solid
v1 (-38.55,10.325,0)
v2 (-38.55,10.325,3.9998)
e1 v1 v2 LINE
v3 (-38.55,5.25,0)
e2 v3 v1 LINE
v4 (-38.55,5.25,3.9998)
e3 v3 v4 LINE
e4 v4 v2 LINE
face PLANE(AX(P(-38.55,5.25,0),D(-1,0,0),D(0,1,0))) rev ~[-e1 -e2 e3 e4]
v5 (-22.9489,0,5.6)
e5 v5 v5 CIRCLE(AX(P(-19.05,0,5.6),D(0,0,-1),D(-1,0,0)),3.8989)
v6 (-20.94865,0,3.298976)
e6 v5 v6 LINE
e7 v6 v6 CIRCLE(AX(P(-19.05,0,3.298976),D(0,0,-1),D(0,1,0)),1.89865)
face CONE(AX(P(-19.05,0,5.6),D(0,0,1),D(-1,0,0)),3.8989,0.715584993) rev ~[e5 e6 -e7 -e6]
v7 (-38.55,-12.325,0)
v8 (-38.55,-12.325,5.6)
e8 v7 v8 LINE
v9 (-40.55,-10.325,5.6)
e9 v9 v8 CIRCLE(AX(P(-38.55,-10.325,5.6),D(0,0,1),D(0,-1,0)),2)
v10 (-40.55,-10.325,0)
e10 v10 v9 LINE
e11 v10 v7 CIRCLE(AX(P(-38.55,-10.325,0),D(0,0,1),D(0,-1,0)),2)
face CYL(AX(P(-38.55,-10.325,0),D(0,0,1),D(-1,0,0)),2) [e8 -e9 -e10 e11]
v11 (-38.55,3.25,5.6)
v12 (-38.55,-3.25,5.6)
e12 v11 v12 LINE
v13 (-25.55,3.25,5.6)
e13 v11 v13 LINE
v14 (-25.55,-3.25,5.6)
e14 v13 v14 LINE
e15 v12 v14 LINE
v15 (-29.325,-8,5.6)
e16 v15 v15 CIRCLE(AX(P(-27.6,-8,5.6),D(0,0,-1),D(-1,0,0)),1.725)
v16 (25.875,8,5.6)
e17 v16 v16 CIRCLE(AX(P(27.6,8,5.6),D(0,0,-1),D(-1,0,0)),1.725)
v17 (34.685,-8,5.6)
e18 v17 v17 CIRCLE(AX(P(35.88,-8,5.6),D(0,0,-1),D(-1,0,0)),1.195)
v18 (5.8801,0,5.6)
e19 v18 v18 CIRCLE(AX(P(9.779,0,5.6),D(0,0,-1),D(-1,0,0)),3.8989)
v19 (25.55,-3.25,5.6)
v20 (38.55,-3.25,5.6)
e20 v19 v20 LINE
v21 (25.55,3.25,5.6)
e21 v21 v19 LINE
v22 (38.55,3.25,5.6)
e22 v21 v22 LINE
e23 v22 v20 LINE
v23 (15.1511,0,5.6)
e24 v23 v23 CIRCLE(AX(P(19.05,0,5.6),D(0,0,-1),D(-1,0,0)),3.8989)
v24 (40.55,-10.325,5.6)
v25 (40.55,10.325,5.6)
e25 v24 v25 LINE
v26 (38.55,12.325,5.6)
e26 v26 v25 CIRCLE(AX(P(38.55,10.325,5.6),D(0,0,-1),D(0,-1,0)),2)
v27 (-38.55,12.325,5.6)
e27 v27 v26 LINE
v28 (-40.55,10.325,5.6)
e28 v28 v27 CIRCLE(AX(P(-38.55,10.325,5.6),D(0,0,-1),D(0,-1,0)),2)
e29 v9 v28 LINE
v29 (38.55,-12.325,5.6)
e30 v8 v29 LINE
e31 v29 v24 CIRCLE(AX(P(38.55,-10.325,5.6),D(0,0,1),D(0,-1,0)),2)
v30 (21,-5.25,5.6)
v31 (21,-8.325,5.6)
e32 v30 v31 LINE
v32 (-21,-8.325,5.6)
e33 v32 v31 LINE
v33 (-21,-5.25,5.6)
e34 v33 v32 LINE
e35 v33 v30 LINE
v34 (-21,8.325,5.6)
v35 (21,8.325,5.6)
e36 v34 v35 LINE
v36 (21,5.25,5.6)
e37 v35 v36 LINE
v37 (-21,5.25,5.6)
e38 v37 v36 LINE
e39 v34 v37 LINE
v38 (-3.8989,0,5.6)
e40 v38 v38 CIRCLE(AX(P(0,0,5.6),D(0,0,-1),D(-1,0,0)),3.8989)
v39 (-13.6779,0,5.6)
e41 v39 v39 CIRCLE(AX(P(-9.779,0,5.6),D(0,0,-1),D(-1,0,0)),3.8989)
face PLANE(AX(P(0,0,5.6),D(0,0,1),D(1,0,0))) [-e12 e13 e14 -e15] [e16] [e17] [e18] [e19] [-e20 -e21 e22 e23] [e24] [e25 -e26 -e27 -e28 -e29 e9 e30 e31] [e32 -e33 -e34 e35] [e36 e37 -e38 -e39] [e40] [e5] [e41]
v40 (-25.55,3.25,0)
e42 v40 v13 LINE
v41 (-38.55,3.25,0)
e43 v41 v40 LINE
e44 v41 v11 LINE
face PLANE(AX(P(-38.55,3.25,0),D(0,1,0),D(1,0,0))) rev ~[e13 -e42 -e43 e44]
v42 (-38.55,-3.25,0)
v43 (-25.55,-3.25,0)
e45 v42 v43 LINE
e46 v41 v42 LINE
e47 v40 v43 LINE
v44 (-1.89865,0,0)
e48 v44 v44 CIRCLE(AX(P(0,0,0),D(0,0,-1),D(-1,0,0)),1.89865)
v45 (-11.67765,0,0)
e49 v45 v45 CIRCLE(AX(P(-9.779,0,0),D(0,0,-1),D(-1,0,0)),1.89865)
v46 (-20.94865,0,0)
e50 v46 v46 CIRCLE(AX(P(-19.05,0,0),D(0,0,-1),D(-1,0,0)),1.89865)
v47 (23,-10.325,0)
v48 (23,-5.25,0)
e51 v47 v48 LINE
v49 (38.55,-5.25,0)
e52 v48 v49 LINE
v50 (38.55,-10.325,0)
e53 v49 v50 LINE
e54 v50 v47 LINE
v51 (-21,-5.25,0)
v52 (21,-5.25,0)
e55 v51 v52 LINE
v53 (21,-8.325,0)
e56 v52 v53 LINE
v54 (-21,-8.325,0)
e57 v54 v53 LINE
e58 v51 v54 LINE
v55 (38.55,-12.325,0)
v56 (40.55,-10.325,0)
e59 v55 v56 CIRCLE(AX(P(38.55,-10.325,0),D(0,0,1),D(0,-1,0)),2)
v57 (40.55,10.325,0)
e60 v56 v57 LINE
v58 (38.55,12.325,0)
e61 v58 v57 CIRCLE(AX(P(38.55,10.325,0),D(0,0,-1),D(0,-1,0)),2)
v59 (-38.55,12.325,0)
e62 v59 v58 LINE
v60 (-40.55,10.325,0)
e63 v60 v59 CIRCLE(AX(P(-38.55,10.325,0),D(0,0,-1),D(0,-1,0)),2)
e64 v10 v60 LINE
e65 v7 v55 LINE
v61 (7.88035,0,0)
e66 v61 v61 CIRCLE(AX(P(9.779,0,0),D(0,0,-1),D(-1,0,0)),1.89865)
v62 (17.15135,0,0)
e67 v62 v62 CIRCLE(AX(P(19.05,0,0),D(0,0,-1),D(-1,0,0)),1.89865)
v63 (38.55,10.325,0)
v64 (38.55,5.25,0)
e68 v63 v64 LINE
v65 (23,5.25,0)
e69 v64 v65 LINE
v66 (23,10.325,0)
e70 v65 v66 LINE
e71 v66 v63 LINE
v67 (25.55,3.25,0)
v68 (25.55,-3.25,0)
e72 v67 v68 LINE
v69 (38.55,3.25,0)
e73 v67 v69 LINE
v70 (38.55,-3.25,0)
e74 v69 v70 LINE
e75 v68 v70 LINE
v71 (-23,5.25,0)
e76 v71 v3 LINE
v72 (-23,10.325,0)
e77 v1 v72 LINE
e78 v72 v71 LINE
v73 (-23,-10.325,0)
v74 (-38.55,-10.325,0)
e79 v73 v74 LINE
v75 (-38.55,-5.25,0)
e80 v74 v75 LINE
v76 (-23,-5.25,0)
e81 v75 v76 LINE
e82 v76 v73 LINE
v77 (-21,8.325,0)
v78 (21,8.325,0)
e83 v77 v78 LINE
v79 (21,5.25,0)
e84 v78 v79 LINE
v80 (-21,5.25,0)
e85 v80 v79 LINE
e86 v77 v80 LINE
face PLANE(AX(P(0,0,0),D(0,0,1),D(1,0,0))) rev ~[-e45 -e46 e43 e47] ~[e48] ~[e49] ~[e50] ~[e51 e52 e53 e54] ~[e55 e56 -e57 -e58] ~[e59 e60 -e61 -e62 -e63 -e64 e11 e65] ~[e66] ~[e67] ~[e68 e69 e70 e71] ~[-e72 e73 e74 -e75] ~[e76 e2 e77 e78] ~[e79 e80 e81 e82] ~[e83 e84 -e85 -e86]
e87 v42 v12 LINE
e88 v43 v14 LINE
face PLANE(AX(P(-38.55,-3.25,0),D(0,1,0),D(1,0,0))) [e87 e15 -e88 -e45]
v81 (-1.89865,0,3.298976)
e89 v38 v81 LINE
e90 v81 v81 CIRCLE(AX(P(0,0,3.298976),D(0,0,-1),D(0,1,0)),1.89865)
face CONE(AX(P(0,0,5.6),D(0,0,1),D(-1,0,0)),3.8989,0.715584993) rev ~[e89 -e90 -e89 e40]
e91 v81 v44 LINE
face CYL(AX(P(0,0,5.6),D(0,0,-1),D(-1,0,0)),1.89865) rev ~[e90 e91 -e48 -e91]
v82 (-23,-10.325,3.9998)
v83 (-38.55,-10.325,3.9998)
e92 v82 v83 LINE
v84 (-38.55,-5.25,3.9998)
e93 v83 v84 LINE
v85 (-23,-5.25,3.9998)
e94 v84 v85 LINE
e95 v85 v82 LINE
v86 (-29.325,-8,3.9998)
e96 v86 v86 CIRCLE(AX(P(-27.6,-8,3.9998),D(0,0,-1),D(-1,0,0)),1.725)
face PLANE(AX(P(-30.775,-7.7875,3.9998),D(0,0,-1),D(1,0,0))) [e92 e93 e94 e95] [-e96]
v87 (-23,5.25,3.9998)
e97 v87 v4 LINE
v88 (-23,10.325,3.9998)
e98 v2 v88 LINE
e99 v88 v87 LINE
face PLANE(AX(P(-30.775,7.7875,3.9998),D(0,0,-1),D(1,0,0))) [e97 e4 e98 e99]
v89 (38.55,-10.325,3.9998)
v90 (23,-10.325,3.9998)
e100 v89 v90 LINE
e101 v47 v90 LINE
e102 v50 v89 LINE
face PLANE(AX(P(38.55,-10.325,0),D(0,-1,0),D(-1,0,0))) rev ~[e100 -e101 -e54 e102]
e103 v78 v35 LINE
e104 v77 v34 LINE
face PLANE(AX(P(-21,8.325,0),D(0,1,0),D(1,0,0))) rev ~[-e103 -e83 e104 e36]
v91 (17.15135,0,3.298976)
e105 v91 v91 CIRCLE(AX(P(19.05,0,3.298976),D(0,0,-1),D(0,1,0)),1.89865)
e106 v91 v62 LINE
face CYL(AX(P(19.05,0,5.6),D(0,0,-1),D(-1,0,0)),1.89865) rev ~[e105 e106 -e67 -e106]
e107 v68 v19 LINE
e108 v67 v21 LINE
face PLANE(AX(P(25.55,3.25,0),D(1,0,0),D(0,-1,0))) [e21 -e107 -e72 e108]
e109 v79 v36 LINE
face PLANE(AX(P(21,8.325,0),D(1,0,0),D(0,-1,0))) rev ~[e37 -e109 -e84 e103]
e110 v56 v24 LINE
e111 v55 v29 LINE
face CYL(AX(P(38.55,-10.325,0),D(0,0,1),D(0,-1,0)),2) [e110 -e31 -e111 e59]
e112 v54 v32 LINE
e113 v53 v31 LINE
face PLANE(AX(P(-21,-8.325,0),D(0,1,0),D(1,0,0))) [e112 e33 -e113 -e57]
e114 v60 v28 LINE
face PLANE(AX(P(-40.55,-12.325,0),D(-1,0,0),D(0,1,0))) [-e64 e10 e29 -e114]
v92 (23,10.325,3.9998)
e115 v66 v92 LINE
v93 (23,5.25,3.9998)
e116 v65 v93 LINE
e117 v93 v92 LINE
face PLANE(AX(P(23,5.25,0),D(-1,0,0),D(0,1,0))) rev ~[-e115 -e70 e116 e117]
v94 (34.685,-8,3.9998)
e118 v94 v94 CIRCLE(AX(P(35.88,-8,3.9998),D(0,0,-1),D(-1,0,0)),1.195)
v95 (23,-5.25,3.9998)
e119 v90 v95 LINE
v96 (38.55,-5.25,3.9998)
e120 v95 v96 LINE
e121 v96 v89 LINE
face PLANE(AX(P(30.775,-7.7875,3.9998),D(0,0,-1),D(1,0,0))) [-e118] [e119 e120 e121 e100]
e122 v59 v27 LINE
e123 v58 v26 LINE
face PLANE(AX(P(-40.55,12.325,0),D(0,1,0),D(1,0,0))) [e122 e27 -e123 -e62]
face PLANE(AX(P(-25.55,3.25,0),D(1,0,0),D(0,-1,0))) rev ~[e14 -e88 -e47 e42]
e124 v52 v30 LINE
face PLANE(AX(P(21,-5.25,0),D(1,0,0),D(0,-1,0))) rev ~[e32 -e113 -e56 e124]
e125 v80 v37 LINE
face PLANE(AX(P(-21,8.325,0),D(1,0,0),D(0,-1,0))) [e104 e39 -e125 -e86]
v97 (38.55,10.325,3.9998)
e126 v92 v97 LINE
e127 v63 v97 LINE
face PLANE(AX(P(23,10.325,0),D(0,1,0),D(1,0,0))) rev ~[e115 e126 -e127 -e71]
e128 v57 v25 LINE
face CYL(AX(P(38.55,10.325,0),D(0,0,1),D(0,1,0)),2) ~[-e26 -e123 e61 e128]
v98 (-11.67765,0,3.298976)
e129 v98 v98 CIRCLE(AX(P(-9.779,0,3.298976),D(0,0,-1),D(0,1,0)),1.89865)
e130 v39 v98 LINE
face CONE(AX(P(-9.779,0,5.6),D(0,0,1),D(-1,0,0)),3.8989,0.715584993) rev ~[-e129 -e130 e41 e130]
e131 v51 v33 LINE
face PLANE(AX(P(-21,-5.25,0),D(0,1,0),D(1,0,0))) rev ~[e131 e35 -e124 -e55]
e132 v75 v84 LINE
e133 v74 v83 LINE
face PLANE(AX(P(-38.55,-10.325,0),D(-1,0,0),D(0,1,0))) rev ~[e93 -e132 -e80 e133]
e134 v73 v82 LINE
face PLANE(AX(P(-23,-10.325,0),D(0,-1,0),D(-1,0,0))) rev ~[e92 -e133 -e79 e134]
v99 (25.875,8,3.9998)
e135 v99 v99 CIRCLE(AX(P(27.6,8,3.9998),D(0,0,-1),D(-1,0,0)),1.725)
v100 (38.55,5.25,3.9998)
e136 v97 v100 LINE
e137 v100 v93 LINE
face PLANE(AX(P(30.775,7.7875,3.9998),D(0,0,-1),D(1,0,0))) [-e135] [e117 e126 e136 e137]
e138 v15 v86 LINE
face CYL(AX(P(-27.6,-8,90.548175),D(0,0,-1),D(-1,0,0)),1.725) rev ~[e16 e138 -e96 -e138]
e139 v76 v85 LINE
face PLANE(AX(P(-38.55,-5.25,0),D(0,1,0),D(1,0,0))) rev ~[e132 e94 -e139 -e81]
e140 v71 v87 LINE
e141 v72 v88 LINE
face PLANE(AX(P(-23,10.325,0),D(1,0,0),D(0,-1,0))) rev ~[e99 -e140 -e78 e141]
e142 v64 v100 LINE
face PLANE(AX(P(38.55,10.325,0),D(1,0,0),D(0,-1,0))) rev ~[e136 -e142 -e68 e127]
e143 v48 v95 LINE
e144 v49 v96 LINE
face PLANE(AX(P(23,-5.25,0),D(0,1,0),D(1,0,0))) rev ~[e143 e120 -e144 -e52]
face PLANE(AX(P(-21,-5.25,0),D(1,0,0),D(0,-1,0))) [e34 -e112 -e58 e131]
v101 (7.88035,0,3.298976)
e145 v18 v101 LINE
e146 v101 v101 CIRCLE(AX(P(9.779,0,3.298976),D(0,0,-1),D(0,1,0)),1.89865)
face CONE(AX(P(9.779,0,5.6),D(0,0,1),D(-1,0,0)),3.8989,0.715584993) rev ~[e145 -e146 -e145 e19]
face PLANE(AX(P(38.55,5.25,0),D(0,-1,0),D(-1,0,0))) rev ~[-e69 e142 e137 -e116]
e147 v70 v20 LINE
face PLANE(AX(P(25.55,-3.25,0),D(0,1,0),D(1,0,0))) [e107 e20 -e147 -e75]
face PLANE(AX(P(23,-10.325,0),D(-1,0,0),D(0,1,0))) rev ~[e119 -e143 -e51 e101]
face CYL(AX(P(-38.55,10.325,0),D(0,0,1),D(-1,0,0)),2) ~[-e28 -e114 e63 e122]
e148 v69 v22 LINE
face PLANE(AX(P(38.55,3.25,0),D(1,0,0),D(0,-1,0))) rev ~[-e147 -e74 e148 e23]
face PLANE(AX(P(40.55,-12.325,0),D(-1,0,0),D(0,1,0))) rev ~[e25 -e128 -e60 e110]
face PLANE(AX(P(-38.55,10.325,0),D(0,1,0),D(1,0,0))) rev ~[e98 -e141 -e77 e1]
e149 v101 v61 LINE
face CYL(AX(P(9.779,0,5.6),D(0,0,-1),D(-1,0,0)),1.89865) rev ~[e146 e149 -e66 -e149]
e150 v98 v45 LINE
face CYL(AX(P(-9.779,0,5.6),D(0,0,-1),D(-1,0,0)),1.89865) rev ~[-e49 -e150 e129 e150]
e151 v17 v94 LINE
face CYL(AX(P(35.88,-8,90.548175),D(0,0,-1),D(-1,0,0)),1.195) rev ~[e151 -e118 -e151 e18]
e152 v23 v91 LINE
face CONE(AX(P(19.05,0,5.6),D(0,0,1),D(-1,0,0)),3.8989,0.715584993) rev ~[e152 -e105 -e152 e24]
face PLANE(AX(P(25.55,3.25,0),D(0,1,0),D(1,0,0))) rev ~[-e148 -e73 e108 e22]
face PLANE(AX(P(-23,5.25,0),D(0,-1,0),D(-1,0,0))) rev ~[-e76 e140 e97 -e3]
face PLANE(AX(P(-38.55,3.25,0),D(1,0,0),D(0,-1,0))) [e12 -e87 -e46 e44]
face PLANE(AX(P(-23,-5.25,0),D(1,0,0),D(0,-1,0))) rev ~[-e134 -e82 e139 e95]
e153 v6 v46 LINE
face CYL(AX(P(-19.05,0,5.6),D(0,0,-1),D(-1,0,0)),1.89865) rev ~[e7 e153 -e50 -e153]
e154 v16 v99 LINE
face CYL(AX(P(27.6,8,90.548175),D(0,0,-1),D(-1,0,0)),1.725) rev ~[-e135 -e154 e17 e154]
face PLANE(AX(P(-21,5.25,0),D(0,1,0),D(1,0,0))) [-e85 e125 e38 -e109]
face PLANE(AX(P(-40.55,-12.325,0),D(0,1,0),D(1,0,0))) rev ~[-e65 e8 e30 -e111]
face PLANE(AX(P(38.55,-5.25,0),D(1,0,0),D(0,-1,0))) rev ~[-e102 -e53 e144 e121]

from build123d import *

# Parameters (mm, degrees)
F0_W           = 81.1
F0_H           = 24.65
F1_DEPTH       = 5.6
F3_D           = 3.45
F4_D           = 2.39
F6_D           = 3.7973
F6_CSINK_D     = 7.7978
F6_CSINK_ANGLE = 82
F7_R           = 1.725
F7_R_2         = 1.195
F8_DEPTH       = 3.9998
F7_W           = 42
F7_H           = 3.075
F7_W_2         = 13
F7_H_2         = 6.5
F9_DEPTH       = 5.6
F10_R          = 2


# Not quite as in the source:
# - a feature names something its author has since deleted; it is built from what else it names


with BuildPart() as f1:
    # F0 (on Top) → F1 (new body)
    with BuildSketch(Plane.XY):
        Rectangle(F0_W, F0_H)
    extrude(amount=F1_DEPTH)

    # F3 (through all)
    with Locations(Plane.XY.offset(5.6)):
        with Locations((-27.6, -8), (27.6, 8)):
            Hole(F3_D / 2)

    # F4 (through all)
    with Locations(Plane.XY.offset(5.6)):
        with Locations((35.88, -8)):
            Hole(F4_D / 2)

    # F6 (through all)
    with Locations(Plane.XY.offset(5.6)):
        with Locations((-19.05, 0), (-9.779, 0), (0, 0), (9.779, 0), (19.05, 0)):
            CounterSinkHole(F6_D / 2, F6_CSINK_D / 2, counter_sink_angle=F6_CSINK_ANGLE)

    # F7 (on face) → F8 (cut, through all)
    with BuildSketch(Plane(origin=(0, 0, 0), x_dir=(1, 0, 0), z_dir=(0, 0, -1))):
        Polygon((-38.55, 10.325), (-38.55, 5.25), (-23.55, 5.25), (-23, 5.25), (-23, 10.325), align=None)
        with Locations((-27.6, 8)):
            Circle(F7_R, mode=Mode.SUBTRACT)
        Polygon((-23.55, -5.25), (-38.55, -5.25), (-38.55, -10.325), (-23, -10.325), (-23, -5.25), align=None)
        Polygon((38.55, -10.325), (38.55, -5.25), (23.55, -5.25), (23, -5.25), (23, -10.325), align=None)
        with Locations((27.6, -8)):
            Circle(F7_R, mode=Mode.SUBTRACT)
        Polygon((23.55, 5.25), (38.55, 5.25), (38.55, 10.325), (23, 10.325), (23, 5.25), align=None)
        with Locations((35.88, 8)):
            Circle(F7_R_2, mode=Mode.SUBTRACT)
    extrude(amount=-F8_DEPTH, mode=Mode.SUBTRACT)

    # F7 (on face) → F9 (cut, through all)
    with BuildSketch(Plane(origin=(0, 0, 0), x_dir=(1, 0, 0), z_dir=(0, 0, -1))):
        with Locations((0, -6.7875)):
            Rectangle(F7_W, F7_H)
        with Locations((-32.05, 0)):
            Rectangle(F7_W_2, F7_H_2)
        with Locations((32.05, 0)):
            Rectangle(F7_W_2, F7_H_2)
        with Locations((0, 6.7875)):
            Rectangle(F7_W, F7_H)
    extrude(amount=-F9_DEPTH, mode=Mode.SUBTRACT)

    # F10
    f10_edges = [f1.edges().sort_by_distance(p)[0] for p in [
        (40.55, 12.325, 2.8),
        (-40.55, 12.325, 2.8),
        (-40.55, -12.325, 2.8),
        (40.55, -12.325, 2.8),
    ]]
    fillet(f10_edges, radius=F10_R)


solid = f1.part
